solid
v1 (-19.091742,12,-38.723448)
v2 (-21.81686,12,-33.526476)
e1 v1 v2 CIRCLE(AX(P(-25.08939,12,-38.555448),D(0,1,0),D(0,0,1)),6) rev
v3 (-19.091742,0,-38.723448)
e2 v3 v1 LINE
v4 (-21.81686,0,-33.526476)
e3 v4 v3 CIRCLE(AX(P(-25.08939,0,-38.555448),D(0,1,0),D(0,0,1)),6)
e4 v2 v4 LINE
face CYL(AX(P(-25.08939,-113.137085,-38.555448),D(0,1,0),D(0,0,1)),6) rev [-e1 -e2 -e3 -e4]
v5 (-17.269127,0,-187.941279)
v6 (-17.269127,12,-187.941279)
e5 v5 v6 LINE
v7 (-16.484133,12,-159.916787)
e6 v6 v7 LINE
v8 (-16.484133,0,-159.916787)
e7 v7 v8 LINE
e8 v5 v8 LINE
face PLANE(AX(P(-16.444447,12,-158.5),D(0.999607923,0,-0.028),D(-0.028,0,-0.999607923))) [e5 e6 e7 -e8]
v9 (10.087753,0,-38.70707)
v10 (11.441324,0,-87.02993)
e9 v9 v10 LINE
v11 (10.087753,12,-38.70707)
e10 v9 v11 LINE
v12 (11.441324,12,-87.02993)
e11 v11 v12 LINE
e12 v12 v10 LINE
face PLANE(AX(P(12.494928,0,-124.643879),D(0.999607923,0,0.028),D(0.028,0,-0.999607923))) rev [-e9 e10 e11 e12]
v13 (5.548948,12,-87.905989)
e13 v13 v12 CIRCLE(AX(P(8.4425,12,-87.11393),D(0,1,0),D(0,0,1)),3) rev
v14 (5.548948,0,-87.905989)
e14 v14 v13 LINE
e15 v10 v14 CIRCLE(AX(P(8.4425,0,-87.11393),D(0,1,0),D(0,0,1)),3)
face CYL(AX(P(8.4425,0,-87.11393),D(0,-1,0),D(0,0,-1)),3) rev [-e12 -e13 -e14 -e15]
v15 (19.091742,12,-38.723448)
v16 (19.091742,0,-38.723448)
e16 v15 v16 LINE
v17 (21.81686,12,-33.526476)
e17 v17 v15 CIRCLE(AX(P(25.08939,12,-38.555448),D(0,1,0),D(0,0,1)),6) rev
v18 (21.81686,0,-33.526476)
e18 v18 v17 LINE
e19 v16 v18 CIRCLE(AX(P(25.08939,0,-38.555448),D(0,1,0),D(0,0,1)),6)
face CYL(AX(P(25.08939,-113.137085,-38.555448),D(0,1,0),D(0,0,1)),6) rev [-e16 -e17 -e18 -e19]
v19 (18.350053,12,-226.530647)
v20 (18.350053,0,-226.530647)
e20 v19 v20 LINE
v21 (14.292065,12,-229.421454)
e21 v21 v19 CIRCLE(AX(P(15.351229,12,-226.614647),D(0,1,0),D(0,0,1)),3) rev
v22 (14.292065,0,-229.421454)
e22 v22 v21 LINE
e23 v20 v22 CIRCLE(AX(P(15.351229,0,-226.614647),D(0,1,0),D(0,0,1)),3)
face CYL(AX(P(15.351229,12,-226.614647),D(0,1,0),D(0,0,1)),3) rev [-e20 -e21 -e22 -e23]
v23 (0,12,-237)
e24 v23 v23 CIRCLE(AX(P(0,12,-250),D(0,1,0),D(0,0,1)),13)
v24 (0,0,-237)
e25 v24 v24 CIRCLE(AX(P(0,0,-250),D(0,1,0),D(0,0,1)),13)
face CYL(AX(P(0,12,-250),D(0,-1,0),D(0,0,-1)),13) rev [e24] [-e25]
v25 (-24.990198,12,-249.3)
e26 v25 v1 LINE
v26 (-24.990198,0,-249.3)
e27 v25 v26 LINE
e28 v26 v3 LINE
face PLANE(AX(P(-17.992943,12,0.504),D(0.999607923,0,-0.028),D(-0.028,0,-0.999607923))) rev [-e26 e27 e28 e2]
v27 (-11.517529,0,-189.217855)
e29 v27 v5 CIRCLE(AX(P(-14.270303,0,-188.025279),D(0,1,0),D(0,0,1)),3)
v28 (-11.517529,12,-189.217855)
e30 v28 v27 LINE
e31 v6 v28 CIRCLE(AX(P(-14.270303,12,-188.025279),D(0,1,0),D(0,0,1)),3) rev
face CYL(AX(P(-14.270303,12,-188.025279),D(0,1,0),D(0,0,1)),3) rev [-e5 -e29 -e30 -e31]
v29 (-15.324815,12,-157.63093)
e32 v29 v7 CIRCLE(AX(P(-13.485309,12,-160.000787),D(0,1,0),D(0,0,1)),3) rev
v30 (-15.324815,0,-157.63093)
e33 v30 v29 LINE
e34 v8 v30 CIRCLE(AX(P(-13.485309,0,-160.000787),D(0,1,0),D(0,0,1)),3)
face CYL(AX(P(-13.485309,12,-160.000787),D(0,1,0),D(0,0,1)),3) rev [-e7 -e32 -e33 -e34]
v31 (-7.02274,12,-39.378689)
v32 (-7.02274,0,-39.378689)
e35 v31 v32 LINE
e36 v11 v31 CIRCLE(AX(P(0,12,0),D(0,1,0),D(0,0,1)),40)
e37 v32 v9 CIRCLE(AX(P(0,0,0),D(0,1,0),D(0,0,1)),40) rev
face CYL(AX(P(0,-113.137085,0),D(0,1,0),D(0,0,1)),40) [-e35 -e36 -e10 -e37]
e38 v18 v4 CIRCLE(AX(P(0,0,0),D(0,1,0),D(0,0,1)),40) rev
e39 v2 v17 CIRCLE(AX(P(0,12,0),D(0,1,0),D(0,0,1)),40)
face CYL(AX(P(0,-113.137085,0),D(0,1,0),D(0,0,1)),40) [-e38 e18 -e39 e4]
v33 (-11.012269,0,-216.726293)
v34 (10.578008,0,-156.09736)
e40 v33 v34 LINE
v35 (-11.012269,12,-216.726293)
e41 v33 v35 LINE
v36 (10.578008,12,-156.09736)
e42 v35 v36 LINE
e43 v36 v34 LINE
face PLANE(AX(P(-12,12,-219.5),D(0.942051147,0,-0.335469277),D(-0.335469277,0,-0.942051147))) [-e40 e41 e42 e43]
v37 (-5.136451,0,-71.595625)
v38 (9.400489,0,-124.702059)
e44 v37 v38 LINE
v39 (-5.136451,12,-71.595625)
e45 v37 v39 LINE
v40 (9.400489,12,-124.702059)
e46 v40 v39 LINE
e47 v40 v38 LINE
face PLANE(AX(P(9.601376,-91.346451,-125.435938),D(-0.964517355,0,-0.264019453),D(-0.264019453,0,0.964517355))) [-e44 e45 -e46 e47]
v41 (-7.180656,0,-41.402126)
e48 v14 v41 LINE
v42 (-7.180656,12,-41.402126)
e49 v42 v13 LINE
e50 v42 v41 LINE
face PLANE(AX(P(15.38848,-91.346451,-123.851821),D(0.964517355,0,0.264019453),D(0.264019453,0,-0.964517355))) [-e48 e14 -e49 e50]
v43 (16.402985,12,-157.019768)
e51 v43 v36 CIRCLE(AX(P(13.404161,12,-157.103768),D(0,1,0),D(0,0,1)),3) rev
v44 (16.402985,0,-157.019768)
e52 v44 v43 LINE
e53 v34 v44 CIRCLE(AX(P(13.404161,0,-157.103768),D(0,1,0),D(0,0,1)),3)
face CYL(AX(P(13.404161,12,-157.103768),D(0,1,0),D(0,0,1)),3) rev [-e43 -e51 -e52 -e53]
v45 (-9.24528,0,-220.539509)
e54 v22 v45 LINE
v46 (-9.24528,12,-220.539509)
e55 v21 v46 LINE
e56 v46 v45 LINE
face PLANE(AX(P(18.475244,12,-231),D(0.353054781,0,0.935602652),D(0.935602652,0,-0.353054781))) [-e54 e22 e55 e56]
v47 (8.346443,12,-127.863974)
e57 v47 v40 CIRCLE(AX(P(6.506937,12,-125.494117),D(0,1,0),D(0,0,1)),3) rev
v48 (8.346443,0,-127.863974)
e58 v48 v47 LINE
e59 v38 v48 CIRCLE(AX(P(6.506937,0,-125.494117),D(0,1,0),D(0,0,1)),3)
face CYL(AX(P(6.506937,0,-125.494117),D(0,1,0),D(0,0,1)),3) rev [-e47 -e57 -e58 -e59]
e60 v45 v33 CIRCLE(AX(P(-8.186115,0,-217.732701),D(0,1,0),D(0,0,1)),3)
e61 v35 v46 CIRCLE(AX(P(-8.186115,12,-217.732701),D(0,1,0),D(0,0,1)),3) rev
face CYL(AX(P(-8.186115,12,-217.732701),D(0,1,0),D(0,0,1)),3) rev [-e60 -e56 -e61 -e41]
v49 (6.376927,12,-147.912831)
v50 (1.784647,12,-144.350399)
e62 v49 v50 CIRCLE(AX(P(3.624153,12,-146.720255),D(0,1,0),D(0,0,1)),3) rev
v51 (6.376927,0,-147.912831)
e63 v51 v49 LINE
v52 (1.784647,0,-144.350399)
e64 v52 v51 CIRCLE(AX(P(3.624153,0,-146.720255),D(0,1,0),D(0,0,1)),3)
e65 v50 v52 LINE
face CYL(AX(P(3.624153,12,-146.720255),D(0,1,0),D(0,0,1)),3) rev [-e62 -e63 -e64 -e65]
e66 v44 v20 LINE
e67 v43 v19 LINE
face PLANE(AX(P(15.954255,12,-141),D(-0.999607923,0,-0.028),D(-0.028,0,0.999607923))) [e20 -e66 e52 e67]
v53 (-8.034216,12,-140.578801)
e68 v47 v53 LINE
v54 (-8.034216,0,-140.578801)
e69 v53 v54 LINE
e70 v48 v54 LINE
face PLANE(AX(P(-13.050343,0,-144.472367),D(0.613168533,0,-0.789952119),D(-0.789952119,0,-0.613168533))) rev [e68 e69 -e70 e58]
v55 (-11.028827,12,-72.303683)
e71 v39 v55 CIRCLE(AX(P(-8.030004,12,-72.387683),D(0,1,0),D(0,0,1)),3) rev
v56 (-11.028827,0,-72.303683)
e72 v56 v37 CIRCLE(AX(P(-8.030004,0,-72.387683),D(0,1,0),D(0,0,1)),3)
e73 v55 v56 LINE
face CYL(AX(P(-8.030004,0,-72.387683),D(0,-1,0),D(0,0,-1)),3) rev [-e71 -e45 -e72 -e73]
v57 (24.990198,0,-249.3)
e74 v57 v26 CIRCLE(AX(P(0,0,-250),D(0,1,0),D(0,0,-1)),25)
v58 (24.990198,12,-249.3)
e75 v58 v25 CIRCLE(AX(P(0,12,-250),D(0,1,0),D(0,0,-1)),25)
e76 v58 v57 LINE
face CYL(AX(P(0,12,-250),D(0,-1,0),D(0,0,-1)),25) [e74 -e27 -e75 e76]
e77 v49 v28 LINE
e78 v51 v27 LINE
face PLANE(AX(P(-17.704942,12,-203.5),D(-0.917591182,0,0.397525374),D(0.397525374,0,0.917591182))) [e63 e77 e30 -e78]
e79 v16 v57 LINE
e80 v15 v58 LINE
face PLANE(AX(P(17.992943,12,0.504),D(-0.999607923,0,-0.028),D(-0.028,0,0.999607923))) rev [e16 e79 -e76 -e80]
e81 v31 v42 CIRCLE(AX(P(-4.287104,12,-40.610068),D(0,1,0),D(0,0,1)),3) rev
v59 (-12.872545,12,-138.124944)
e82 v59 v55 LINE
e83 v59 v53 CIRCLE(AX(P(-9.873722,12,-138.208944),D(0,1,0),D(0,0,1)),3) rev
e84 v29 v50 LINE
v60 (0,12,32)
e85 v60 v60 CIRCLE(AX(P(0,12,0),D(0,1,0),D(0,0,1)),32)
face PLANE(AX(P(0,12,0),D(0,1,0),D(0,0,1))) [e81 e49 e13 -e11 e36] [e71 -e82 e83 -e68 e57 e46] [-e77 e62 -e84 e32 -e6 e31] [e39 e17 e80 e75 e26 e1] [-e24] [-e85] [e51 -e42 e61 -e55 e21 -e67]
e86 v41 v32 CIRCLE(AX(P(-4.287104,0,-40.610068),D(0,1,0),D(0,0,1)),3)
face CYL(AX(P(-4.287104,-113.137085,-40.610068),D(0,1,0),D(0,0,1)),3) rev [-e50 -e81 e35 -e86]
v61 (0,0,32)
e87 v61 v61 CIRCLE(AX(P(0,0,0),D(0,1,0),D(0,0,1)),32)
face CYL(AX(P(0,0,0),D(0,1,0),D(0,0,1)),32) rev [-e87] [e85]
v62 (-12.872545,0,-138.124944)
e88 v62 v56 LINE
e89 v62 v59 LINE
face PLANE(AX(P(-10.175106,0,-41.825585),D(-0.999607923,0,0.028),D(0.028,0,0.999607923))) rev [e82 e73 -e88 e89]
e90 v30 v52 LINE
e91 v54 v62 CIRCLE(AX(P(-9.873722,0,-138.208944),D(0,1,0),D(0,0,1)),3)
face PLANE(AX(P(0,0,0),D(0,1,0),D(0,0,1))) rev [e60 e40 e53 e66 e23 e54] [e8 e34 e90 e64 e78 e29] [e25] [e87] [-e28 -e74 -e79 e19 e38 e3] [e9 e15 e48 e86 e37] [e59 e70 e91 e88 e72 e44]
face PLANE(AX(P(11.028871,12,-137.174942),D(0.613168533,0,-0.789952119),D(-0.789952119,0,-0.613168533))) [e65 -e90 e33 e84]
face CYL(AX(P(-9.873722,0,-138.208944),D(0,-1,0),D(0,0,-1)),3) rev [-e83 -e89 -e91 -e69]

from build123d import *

# Parameters (mm, degrees)
SKETCH_1_R          = 5.05
SKETCH_1_R_2        = 13
EXTRUDE_1_DEPTH     = 12
FILLET_1_R          = 3
CUT_EXTRUDE_3_DEPTH = 277.39464539
FILLET_2_R          = 3
EXTRUDE_START       = -12
SKETCH_5_R          = 40
SKETCH_5_R_2        = 5.05
EXTRUDE_2_DEPTH     = 12
FILLET_3_R          = 6
EXTRUDE_3_DEPTH     = 12
FILLET_4_R          = 3
SKETCH_8_R          = 32
CUT_EXTRUDE_5_DEPTH = 279.152835686


with BuildPart() as part:
    # 草图1 → 凸台-拉伸1 (new body)
    with BuildSketch(Plane(origin=(0, 0, 0), x_dir=(1, 0, 0), z_dir=(0, 1, 0))):
        with BuildLine():
            Line((-17.992942616, -0.504), (-24.990198078, 249.3))
            ThreePointArc((-24.990198078, 249.3), (0, 275), (24.990198078, 249.3))
            Line((24.990198078, 249.3), (17.992942616, -0.504))
            ThreePointArc((17.992942616, -0.504), (0, -18), (-17.992942616, -0.504))
        make_face()
        with Locations(Location((0, 0, 0), (0, 0, 270))):
            Circle(SKETCH_1_R, mode=Mode.SUBTRACT)
        with Locations(Location((0, 250, 0), (0, 0, 270))):
            Circle(SKETCH_1_R_2, mode=Mode.SUBTRACT)
        Polygon((-16.444447487, 158.5), (-17.704941698, 203.5), (11.028871219, 137.174942267), align=None, mode=Mode.SUBTRACT)
        Polygon((15.954255294, 141), (18.475243716, 231), (-12, 219.5), align=None, mode=Mode.SUBTRACT)
    extrude(amount=EXTRUDE_1_DEPTH)

    # 圆角1
    fillet_1_edges = [part.edges().sort_by_distance(p)[0] for p in [
        (-16.444447487, 6, -158.5),
        (11.028871219, 6, -137.174942267),
        (-17.704941698, 6, -203.5),
        (18.475243716, 6, -231),
        (-12, 6, -219.5),
        (15.954255294, 6, -141),
    ]]
    fillet(fillet_1_edges, radius=FILLET_1_R)

    # 草图4 → 切除-拉伸3 (cut, through all)
    with BuildSketch(Plane(origin=(0, 12, 0), x_dir=(1, 0, 0), z_dir=(0, 1, 0))):
        Polygon((-13.050343026, 144.472367448), (12.494927596, 124.643879429), (9.742058902, 26.365688077), (-10.175105816, 41.825585442), align=None)
    extrude(amount=-CUT_EXTRUDE_3_DEPTH, mode=Mode.SUBTRACT)

    # 圆角2
    fillet_2_edges = [part.edges().sort_by_distance(p)[0] for p in [
        (-10.175105816, 6, -41.825585442),
        (-13.050343026, 6, -144.472367448),
        (9.742058902, 6, -26.365688077),
    ]]
    fillet(fillet_2_edges, radius=FILLET_2_R)

    # 草图5 → 凸台-拉伸2 (add)
    with BuildSketch(Plane(origin=(0, 12, 0), x_dir=(1, 0, 0), z_dir=(0, 1, 0)).offset(EXTRUDE_START)):
        Circle(SKETCH_5_R)
        with Locations(Location((0, 0, 0), (0, 0, 270))):
            Circle(SKETCH_5_R_2, mode=Mode.SUBTRACT)
    extrude(amount=EXTRUDE_2_DEPTH)

    # 圆角3
    fillet_3_edges = [part.edges().sort_by_distance(p)[0] for p in [
        (18.993134598, 6, -35.203136766),
        (-18.993134598, 6, -35.203136766),
    ]]
    fillet(fillet_3_edges, radius=FILLET_3_R)

    # 草图6 → 凸台-拉伸3 (add)
    with BuildSketch(Plane(origin=(0, 12, 0), x_dir=(1, 0, 0), z_dir=(0, 1, 0))):
        Polygon((9.60137553, 125.435937788), (-13.068657882, 42.617643801), (-7.609801347, 39.834371112), (-7.28155375, 41.033527083), (15.388479662, 123.85182107), (9.929623127, 126.635093759), align=None)
    extrude(amount=-EXTRUDE_3_DEPTH)

    # 圆角4
    # the kernel refuses this fillet: 3 mm, written as the material it adds along each edge
    with BuildSketch(Plane(origin=(12.14036175, 0, -111.985778385), x_dir=(-0.028000000000000382, 0, 0.9996079231378672), z_dir=(0, 1, 0))) as fillet_4_piece_1:
        with BuildLine():
            CenterArc((FILLET_4_R * 8.32187878655, -FILLET_4_R), FILLET_4_R, 90, 166.295794849)
            Line((FILLET_4_R * 8.08496933551, -FILLET_4_R * 1.97153173495), (FILLET_4_R * 8.08023114649, -FILLET_4_R * 1.99096236965))
            Line((FILLET_4_R * 8.08023114649, -FILLET_4_R * 1.99096236965), (-FILLET_4_R * 0.0047381890208, -FILLET_4_R * 0.0194306346989))
            Line((-FILLET_4_R * 0.0047381890208, -FILLET_4_R * 0.0194306346989), (0, FILLET_4_R * 0.02))
            Line((0, FILLET_4_R * 0.02), (FILLET_4_R * 8.32187878655, FILLET_4_R * 0.02))
            Line((FILLET_4_R * 8.32187878655, FILLET_4_R * 0.02), (FILLET_4_R * 8.32187878655, 0))
        make_face()
    extrude(amount=12)
    with BuildSketch(Plane(origin=(-10.463842583, 0, -52.133569747), x_dir=(-0.02799999999999904, 0, -0.9996079231378672), z_dir=(0, 1, 0))) as fillet_4_piece_2:
        with BuildLine():
            CenterArc((FILLET_4_R * 6.72600834912, -FILLET_4_R), FILLET_4_R, 90, 163.086811796)
            Line((FILLET_4_R * 6.43508592619, -FILLET_4_R * 1.95674664558), (FILLET_4_R * 6.42926747773, -FILLET_4_R * 1.9758815785))
            Line((FILLET_4_R * 6.42926747773, -FILLET_4_R * 1.9758815785), (-FILLET_4_R * 0.00581844845863, -FILLET_4_R * 0.0191349329117))
            Line((-FILLET_4_R * 0.00581844845863, -FILLET_4_R * 0.0191349329117), (0, FILLET_4_R * 0.02))
            Line((0, FILLET_4_R * 0.02), (FILLET_4_R * 6.72600834912, FILLET_4_R * 0.02))
            Line((FILLET_4_R * 6.72600834912, FILLET_4_R * 0.02), (FILLET_4_R * 6.72600834912, 0))
        make_face()
    extrude(amount=12)
    with BuildSketch(Plane(origin=(9.929623127, 12, -126.635093759), x_dir=(-0.7899521186549702, 0, -0.6131685333026506), z_dir=(0, -1, 0))) as fillet_4_piece_3:
        with BuildLine():
            CenterArc((FILLET_4_R * 0.668049057951, -FILLET_4_R), FILLET_4_R, 90, 67.489733811)
            Line((-FILLET_4_R * 0.255761890972, -FILLET_4_R * 0.617151034153), (-FILLET_4_R * 0.27423810995, -FILLET_4_R * 0.609494054836))
            Line((-FILLET_4_R * 0.27423810995, -FILLET_4_R * 0.609494054836), (-FILLET_4_R * 0.013360981159, FILLET_4_R * 0.02))
            Line((-FILLET_4_R * 0.013360981159, FILLET_4_R * 0.02), (FILLET_4_R * 0.668049057951, FILLET_4_R * 0.02))
            Line((FILLET_4_R * 0.668049057951, FILLET_4_R * 0.02), (FILLET_4_R * 0.668049057951, 0))
        make_face()
    extrude(amount=12)
    with BuildSketch(Plane(origin=(-7.609801347, 12, -39.834371112), x_dir=(0.789952118654971, 0, 0.6131685333026496), z_dir=(0, -1, 0))) as fillet_4_piece_4:
        with BuildLine():
            CenterArc((2.149138752, -2.650136686), FILLET_4_R, 117.947316923, 39.542416888)
            Line((-0.622294094, -1.501589789), (-0.677722751, -1.478618851))
            Line((-0.677722751, -1.478618851), (-0.055428657, 0.022970938))
            Line((-0.055428657, 0.022970938), (0, 0.06))
            ThreePointArc((0, 0.06), (0.371580126, 0.06), (0.715040682, 0.053002734))
            Line((0.715040682, 0.053002734), (0.743160252, 0))
        make_face()
    extrude(amount=12)

    # 草图8 → 切除-拉伸5 (cut, through all)
    with BuildSketch(Plane(origin=(0, 12, 0), x_dir=(1, 0, 0), z_dir=(0, 1, 0))):
        with Locations(Location((0, 0, 0), (0, 0, 270))):
            Circle(SKETCH_8_R)
    extrude(amount=-CUT_EXTRUDE_5_DEPTH, mode=Mode.SUBTRACT)


solid = part.part
